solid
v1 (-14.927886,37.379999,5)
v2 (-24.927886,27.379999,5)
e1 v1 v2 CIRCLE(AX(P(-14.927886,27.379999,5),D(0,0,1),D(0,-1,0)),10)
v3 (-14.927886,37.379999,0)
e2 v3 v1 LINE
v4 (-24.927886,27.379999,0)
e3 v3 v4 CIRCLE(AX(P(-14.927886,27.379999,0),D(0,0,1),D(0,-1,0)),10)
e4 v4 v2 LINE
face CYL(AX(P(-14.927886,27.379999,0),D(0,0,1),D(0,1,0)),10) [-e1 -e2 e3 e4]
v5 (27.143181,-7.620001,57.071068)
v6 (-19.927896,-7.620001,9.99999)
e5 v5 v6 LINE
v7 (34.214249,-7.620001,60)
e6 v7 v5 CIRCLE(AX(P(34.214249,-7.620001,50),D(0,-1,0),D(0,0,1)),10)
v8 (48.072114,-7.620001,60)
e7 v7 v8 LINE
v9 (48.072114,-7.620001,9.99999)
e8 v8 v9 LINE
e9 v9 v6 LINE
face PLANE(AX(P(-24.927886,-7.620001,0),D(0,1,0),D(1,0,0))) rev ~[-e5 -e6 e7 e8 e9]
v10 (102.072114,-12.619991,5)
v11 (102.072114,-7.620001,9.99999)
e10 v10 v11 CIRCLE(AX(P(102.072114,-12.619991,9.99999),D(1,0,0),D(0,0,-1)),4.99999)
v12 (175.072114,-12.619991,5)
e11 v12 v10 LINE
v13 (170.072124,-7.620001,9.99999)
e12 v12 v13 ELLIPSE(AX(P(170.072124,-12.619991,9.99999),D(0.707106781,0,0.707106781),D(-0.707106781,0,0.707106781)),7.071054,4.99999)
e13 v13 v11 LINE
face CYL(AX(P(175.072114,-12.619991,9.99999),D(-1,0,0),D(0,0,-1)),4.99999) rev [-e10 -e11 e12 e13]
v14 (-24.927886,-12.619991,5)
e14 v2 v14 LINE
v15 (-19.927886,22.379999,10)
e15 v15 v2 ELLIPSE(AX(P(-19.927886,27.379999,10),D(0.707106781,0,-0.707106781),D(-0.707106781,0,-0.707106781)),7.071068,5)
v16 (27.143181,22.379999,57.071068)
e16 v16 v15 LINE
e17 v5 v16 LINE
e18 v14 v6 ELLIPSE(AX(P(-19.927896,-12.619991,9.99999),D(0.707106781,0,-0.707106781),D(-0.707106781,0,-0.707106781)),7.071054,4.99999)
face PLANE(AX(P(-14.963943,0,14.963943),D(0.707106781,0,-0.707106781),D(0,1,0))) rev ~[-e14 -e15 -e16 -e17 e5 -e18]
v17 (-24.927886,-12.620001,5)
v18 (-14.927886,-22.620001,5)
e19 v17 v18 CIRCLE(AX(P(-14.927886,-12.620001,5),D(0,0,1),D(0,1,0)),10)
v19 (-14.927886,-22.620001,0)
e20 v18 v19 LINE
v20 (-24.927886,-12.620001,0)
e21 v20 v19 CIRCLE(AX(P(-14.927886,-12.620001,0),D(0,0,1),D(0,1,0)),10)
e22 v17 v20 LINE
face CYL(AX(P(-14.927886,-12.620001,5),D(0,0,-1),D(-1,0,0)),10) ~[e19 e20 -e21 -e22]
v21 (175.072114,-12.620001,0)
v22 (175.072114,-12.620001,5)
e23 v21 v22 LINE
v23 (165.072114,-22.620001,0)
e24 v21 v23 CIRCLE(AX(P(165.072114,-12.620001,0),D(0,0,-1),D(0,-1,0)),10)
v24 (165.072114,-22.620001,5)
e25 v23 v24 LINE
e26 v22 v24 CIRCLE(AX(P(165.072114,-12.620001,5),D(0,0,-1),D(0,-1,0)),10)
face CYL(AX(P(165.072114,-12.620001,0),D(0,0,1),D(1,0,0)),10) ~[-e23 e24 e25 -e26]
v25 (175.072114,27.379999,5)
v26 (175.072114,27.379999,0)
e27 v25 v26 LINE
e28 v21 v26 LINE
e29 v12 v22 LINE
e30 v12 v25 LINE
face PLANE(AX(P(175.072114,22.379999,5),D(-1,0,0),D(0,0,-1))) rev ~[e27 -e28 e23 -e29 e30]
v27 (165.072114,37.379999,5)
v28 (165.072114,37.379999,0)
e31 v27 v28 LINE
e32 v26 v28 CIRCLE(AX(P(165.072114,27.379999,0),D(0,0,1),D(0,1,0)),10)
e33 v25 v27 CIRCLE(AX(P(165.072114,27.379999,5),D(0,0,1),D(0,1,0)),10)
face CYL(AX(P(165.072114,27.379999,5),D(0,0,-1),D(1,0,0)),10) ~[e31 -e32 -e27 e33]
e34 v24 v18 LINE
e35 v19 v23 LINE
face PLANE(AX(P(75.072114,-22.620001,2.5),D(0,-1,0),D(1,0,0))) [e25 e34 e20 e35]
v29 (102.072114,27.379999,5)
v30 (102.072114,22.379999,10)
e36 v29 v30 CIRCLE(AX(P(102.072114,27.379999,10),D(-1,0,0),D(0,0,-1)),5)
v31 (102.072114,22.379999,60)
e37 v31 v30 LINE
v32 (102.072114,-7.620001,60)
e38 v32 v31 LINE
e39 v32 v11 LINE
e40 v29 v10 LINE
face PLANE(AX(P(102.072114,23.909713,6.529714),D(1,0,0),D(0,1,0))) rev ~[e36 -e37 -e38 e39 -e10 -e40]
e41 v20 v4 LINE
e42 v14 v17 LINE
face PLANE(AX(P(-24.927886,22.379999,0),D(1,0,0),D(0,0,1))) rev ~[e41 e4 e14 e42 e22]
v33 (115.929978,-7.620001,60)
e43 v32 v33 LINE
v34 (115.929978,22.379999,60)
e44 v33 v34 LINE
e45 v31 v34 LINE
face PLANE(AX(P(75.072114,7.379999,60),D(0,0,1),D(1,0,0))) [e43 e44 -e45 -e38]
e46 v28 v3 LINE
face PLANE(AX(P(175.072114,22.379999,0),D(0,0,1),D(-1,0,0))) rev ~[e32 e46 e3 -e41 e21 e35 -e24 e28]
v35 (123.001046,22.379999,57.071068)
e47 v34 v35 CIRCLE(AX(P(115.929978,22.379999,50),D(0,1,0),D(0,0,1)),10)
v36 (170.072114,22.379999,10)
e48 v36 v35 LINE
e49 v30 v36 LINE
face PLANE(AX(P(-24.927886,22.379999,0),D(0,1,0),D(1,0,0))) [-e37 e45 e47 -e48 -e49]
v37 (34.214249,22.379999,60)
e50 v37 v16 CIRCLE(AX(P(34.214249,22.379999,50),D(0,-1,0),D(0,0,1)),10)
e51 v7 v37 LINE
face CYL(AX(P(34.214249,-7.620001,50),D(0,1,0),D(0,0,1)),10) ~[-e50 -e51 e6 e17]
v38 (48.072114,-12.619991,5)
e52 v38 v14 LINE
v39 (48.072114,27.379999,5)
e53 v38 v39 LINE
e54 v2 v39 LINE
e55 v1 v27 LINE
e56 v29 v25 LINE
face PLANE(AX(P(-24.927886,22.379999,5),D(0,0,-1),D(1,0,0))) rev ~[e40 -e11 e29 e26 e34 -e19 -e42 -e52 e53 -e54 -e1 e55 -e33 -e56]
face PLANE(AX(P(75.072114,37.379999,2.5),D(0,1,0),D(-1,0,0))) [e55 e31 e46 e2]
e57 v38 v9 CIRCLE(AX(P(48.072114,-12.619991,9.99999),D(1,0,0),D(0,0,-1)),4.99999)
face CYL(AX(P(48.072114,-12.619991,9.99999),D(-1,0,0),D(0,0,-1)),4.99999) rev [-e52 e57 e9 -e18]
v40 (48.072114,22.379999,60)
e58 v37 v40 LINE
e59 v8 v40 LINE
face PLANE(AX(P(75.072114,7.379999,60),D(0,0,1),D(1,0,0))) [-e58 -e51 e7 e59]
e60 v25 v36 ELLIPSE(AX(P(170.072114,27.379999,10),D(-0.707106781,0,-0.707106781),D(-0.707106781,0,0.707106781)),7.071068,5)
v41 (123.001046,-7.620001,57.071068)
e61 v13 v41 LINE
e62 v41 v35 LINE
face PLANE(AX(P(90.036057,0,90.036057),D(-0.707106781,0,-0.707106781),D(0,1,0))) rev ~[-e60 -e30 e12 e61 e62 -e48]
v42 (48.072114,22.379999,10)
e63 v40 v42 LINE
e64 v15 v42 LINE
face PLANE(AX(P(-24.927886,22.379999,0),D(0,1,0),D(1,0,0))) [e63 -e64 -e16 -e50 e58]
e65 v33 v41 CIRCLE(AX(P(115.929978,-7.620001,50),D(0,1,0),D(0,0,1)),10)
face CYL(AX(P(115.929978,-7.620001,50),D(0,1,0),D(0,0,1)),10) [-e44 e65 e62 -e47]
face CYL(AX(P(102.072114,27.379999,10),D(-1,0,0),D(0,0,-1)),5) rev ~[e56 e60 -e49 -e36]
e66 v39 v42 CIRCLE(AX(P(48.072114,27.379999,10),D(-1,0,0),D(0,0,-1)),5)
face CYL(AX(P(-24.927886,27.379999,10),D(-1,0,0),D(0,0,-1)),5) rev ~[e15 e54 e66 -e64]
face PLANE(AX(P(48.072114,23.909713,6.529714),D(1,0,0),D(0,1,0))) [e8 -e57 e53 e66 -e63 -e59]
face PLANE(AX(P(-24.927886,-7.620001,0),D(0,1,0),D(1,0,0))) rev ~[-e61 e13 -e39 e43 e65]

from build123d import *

# Parameters (mm, degrees)
F0_W         = 200
F0_H         = 30
F1_DEPTH     = 60
F2_SIZE      = 55
F3_SIZE      = 55
F4_W         = 54
F4_H         = 30
F5_DEPTH     = 55
F7_DEPTH     = 15
F8_R         = 10
F9_R         = 4.99999
F11_DEPTH    = 15
F12_T4_DEPTH = 73
F12_T9_DEPTH = 73
F13_R        = 10


# Not quite as in the source:
# - a fillet or chamfer that OpenCascade refuses, or shapes differently, is made with other operations: its cross-section is extruded or revolved along the edge and cut away or added
# - a fillet or chamfer is up to 0.001 mm smaller than in the source, because OpenCascade refuses the exact size


with BuildPart() as f1:
    # F0 (on Top) → F1 (new body)
    with BuildSketch(Plane.XY):
        with Locations((75.0721136101, 7.3799993843)):
            Rectangle(F0_W, F0_H)
    extrude(amount=F1_DEPTH)

    # F2
    f2_edges = [f1.edges().sort_by_distance(p)[0] for p in [
        (175.072114, 7.379999, 60),
    ]]
    chamfer(f2_edges, length=F2_SIZE)

    # F3
    f3_edges = [f1.edges().sort_by_distance(p)[0] for p in [
        (-24.927886, 7.379999, 60),
    ]]
    chamfer(f3_edges, length=F3_SIZE)

    # F4 (on face) → F5 (cut)
    with BuildSketch(Plane.XY.offset(60)):
        with Locations((75.0721136101, 7.3799993843)):
            Rectangle(F4_W, F4_H)
    extrude(amount=-F5_DEPTH, mode=Mode.SUBTRACT)

    # F6 (on face) → F7 (join)
    with BuildSketch(Plane.XZ.offset(7.6200006157)):
        Polygon((48.0721136101, 5), (-24.9278863899, 5), (-24.9278863899, 0), (175.0721136101, 0), (175.0721136101, 5), (102.0721136101, 5), align=None)
    extrude(amount=F7_DEPTH)

    # F8
    f8_edges = [f1.edges().sort_by_distance(p)[0] for p in [
        (175.072114, -22.620001, 2.5),
        (-24.927886, -22.620001, 2.5),
    ]]
    fillet(f8_edges, radius=F8_R)

    # F9 (radius 5 in the source; OpenCascade refuses exactly that, so slightly less here)
    f9_edges = [f1.edges().sort_by_distance(p)[0] for p in [
        (138.572114, -7.620001, 5),
        (11.572114, -7.620001, 5),
    ]]
    fillet(f9_edges, radius=F9_R)

    # F10 (on face) → F11 (join)
    with BuildSketch(Plane(origin=(0, 22.3799993843, 0), x_dir=(-1, 0, 0), z_dir=(0, 1, 0))):
        Polygon((-102.0721136101, 5), (-175.0721136101, 5), (-175.0721136101, 0), (24.9278863899, 0), (24.9278863899, 5), (-48.0721136101, 5), align=None)
    extrude(amount=F11_DEPTH)

    # F12: fillet of radius 5 on 2 edges, made by hand


with BuildPart() as f12_tool2:
    # F12_s3 → F12_t4 (new body)
    with BuildSketch(Plane.YZ.offset(102.0721136101)):
        with BuildLine():
            ThreePointArc((27.3799993843, 5), (23.8444654784, 6.4644660941), (22.3799993843, 10))
            Line((22.3799993843, 10), (22.3799993843, 5))
            Line((22.3799993843, 5), (27.3799993843, 5))
        make_face()
    extrude(amount=F12_T4_DEPTH)

    split(bisect_by=Plane(origin=(90.0360568051, 0, 90.0360568051), x_dir=(0, 1, 0), z_dir=(-0.7071067812, 0, -0.7071067812)), keep=Keep.TOP)


with BuildPart() as f1_1:
    add(f1.part)

    # F12_t1: union F12_tool2
    add(f12_tool2.part)


with BuildPart() as f12_tool7:
    # F12_s8 → F12_t9 (new body)
    with BuildSketch(Plane.YZ.offset(-24.9278863899)):
        with BuildLine():
            ThreePointArc((27.3799993843, 5), (23.8444654784, 6.4644660941), (22.3799993843, 10))
            Line((22.3799993843, 10), (22.3799993843, 5))
            Line((22.3799993843, 5), (27.3799993843, 5))
        make_face()
    extrude(amount=F12_T9_DEPTH)

    split(bisect_by=Plane(origin=(-14.9639431949, 0, 14.9639431949), x_dir=(0, 1, 0), z_dir=(0.7071067812, 0, -0.7071067812)), keep=Keep.TOP)


with BuildPart() as f1_2:
    add(f1_1.part)

    # F12_t6: union F12_tool7
    add(f12_tool7.part)

    # F13
    f13_edges = [f1_2.edges().sort_by_distance(p)[0] for p in [
        (175.072114, 37.379999, 2.5),
        (-24.927886, 37.379999, 2.5),
        (120.072114, 7.379999, 60),
        (30.072114, 7.379999, 60),
    ]]
    fillet(f13_edges, radius=F13_R)


solid = f1_2.part
